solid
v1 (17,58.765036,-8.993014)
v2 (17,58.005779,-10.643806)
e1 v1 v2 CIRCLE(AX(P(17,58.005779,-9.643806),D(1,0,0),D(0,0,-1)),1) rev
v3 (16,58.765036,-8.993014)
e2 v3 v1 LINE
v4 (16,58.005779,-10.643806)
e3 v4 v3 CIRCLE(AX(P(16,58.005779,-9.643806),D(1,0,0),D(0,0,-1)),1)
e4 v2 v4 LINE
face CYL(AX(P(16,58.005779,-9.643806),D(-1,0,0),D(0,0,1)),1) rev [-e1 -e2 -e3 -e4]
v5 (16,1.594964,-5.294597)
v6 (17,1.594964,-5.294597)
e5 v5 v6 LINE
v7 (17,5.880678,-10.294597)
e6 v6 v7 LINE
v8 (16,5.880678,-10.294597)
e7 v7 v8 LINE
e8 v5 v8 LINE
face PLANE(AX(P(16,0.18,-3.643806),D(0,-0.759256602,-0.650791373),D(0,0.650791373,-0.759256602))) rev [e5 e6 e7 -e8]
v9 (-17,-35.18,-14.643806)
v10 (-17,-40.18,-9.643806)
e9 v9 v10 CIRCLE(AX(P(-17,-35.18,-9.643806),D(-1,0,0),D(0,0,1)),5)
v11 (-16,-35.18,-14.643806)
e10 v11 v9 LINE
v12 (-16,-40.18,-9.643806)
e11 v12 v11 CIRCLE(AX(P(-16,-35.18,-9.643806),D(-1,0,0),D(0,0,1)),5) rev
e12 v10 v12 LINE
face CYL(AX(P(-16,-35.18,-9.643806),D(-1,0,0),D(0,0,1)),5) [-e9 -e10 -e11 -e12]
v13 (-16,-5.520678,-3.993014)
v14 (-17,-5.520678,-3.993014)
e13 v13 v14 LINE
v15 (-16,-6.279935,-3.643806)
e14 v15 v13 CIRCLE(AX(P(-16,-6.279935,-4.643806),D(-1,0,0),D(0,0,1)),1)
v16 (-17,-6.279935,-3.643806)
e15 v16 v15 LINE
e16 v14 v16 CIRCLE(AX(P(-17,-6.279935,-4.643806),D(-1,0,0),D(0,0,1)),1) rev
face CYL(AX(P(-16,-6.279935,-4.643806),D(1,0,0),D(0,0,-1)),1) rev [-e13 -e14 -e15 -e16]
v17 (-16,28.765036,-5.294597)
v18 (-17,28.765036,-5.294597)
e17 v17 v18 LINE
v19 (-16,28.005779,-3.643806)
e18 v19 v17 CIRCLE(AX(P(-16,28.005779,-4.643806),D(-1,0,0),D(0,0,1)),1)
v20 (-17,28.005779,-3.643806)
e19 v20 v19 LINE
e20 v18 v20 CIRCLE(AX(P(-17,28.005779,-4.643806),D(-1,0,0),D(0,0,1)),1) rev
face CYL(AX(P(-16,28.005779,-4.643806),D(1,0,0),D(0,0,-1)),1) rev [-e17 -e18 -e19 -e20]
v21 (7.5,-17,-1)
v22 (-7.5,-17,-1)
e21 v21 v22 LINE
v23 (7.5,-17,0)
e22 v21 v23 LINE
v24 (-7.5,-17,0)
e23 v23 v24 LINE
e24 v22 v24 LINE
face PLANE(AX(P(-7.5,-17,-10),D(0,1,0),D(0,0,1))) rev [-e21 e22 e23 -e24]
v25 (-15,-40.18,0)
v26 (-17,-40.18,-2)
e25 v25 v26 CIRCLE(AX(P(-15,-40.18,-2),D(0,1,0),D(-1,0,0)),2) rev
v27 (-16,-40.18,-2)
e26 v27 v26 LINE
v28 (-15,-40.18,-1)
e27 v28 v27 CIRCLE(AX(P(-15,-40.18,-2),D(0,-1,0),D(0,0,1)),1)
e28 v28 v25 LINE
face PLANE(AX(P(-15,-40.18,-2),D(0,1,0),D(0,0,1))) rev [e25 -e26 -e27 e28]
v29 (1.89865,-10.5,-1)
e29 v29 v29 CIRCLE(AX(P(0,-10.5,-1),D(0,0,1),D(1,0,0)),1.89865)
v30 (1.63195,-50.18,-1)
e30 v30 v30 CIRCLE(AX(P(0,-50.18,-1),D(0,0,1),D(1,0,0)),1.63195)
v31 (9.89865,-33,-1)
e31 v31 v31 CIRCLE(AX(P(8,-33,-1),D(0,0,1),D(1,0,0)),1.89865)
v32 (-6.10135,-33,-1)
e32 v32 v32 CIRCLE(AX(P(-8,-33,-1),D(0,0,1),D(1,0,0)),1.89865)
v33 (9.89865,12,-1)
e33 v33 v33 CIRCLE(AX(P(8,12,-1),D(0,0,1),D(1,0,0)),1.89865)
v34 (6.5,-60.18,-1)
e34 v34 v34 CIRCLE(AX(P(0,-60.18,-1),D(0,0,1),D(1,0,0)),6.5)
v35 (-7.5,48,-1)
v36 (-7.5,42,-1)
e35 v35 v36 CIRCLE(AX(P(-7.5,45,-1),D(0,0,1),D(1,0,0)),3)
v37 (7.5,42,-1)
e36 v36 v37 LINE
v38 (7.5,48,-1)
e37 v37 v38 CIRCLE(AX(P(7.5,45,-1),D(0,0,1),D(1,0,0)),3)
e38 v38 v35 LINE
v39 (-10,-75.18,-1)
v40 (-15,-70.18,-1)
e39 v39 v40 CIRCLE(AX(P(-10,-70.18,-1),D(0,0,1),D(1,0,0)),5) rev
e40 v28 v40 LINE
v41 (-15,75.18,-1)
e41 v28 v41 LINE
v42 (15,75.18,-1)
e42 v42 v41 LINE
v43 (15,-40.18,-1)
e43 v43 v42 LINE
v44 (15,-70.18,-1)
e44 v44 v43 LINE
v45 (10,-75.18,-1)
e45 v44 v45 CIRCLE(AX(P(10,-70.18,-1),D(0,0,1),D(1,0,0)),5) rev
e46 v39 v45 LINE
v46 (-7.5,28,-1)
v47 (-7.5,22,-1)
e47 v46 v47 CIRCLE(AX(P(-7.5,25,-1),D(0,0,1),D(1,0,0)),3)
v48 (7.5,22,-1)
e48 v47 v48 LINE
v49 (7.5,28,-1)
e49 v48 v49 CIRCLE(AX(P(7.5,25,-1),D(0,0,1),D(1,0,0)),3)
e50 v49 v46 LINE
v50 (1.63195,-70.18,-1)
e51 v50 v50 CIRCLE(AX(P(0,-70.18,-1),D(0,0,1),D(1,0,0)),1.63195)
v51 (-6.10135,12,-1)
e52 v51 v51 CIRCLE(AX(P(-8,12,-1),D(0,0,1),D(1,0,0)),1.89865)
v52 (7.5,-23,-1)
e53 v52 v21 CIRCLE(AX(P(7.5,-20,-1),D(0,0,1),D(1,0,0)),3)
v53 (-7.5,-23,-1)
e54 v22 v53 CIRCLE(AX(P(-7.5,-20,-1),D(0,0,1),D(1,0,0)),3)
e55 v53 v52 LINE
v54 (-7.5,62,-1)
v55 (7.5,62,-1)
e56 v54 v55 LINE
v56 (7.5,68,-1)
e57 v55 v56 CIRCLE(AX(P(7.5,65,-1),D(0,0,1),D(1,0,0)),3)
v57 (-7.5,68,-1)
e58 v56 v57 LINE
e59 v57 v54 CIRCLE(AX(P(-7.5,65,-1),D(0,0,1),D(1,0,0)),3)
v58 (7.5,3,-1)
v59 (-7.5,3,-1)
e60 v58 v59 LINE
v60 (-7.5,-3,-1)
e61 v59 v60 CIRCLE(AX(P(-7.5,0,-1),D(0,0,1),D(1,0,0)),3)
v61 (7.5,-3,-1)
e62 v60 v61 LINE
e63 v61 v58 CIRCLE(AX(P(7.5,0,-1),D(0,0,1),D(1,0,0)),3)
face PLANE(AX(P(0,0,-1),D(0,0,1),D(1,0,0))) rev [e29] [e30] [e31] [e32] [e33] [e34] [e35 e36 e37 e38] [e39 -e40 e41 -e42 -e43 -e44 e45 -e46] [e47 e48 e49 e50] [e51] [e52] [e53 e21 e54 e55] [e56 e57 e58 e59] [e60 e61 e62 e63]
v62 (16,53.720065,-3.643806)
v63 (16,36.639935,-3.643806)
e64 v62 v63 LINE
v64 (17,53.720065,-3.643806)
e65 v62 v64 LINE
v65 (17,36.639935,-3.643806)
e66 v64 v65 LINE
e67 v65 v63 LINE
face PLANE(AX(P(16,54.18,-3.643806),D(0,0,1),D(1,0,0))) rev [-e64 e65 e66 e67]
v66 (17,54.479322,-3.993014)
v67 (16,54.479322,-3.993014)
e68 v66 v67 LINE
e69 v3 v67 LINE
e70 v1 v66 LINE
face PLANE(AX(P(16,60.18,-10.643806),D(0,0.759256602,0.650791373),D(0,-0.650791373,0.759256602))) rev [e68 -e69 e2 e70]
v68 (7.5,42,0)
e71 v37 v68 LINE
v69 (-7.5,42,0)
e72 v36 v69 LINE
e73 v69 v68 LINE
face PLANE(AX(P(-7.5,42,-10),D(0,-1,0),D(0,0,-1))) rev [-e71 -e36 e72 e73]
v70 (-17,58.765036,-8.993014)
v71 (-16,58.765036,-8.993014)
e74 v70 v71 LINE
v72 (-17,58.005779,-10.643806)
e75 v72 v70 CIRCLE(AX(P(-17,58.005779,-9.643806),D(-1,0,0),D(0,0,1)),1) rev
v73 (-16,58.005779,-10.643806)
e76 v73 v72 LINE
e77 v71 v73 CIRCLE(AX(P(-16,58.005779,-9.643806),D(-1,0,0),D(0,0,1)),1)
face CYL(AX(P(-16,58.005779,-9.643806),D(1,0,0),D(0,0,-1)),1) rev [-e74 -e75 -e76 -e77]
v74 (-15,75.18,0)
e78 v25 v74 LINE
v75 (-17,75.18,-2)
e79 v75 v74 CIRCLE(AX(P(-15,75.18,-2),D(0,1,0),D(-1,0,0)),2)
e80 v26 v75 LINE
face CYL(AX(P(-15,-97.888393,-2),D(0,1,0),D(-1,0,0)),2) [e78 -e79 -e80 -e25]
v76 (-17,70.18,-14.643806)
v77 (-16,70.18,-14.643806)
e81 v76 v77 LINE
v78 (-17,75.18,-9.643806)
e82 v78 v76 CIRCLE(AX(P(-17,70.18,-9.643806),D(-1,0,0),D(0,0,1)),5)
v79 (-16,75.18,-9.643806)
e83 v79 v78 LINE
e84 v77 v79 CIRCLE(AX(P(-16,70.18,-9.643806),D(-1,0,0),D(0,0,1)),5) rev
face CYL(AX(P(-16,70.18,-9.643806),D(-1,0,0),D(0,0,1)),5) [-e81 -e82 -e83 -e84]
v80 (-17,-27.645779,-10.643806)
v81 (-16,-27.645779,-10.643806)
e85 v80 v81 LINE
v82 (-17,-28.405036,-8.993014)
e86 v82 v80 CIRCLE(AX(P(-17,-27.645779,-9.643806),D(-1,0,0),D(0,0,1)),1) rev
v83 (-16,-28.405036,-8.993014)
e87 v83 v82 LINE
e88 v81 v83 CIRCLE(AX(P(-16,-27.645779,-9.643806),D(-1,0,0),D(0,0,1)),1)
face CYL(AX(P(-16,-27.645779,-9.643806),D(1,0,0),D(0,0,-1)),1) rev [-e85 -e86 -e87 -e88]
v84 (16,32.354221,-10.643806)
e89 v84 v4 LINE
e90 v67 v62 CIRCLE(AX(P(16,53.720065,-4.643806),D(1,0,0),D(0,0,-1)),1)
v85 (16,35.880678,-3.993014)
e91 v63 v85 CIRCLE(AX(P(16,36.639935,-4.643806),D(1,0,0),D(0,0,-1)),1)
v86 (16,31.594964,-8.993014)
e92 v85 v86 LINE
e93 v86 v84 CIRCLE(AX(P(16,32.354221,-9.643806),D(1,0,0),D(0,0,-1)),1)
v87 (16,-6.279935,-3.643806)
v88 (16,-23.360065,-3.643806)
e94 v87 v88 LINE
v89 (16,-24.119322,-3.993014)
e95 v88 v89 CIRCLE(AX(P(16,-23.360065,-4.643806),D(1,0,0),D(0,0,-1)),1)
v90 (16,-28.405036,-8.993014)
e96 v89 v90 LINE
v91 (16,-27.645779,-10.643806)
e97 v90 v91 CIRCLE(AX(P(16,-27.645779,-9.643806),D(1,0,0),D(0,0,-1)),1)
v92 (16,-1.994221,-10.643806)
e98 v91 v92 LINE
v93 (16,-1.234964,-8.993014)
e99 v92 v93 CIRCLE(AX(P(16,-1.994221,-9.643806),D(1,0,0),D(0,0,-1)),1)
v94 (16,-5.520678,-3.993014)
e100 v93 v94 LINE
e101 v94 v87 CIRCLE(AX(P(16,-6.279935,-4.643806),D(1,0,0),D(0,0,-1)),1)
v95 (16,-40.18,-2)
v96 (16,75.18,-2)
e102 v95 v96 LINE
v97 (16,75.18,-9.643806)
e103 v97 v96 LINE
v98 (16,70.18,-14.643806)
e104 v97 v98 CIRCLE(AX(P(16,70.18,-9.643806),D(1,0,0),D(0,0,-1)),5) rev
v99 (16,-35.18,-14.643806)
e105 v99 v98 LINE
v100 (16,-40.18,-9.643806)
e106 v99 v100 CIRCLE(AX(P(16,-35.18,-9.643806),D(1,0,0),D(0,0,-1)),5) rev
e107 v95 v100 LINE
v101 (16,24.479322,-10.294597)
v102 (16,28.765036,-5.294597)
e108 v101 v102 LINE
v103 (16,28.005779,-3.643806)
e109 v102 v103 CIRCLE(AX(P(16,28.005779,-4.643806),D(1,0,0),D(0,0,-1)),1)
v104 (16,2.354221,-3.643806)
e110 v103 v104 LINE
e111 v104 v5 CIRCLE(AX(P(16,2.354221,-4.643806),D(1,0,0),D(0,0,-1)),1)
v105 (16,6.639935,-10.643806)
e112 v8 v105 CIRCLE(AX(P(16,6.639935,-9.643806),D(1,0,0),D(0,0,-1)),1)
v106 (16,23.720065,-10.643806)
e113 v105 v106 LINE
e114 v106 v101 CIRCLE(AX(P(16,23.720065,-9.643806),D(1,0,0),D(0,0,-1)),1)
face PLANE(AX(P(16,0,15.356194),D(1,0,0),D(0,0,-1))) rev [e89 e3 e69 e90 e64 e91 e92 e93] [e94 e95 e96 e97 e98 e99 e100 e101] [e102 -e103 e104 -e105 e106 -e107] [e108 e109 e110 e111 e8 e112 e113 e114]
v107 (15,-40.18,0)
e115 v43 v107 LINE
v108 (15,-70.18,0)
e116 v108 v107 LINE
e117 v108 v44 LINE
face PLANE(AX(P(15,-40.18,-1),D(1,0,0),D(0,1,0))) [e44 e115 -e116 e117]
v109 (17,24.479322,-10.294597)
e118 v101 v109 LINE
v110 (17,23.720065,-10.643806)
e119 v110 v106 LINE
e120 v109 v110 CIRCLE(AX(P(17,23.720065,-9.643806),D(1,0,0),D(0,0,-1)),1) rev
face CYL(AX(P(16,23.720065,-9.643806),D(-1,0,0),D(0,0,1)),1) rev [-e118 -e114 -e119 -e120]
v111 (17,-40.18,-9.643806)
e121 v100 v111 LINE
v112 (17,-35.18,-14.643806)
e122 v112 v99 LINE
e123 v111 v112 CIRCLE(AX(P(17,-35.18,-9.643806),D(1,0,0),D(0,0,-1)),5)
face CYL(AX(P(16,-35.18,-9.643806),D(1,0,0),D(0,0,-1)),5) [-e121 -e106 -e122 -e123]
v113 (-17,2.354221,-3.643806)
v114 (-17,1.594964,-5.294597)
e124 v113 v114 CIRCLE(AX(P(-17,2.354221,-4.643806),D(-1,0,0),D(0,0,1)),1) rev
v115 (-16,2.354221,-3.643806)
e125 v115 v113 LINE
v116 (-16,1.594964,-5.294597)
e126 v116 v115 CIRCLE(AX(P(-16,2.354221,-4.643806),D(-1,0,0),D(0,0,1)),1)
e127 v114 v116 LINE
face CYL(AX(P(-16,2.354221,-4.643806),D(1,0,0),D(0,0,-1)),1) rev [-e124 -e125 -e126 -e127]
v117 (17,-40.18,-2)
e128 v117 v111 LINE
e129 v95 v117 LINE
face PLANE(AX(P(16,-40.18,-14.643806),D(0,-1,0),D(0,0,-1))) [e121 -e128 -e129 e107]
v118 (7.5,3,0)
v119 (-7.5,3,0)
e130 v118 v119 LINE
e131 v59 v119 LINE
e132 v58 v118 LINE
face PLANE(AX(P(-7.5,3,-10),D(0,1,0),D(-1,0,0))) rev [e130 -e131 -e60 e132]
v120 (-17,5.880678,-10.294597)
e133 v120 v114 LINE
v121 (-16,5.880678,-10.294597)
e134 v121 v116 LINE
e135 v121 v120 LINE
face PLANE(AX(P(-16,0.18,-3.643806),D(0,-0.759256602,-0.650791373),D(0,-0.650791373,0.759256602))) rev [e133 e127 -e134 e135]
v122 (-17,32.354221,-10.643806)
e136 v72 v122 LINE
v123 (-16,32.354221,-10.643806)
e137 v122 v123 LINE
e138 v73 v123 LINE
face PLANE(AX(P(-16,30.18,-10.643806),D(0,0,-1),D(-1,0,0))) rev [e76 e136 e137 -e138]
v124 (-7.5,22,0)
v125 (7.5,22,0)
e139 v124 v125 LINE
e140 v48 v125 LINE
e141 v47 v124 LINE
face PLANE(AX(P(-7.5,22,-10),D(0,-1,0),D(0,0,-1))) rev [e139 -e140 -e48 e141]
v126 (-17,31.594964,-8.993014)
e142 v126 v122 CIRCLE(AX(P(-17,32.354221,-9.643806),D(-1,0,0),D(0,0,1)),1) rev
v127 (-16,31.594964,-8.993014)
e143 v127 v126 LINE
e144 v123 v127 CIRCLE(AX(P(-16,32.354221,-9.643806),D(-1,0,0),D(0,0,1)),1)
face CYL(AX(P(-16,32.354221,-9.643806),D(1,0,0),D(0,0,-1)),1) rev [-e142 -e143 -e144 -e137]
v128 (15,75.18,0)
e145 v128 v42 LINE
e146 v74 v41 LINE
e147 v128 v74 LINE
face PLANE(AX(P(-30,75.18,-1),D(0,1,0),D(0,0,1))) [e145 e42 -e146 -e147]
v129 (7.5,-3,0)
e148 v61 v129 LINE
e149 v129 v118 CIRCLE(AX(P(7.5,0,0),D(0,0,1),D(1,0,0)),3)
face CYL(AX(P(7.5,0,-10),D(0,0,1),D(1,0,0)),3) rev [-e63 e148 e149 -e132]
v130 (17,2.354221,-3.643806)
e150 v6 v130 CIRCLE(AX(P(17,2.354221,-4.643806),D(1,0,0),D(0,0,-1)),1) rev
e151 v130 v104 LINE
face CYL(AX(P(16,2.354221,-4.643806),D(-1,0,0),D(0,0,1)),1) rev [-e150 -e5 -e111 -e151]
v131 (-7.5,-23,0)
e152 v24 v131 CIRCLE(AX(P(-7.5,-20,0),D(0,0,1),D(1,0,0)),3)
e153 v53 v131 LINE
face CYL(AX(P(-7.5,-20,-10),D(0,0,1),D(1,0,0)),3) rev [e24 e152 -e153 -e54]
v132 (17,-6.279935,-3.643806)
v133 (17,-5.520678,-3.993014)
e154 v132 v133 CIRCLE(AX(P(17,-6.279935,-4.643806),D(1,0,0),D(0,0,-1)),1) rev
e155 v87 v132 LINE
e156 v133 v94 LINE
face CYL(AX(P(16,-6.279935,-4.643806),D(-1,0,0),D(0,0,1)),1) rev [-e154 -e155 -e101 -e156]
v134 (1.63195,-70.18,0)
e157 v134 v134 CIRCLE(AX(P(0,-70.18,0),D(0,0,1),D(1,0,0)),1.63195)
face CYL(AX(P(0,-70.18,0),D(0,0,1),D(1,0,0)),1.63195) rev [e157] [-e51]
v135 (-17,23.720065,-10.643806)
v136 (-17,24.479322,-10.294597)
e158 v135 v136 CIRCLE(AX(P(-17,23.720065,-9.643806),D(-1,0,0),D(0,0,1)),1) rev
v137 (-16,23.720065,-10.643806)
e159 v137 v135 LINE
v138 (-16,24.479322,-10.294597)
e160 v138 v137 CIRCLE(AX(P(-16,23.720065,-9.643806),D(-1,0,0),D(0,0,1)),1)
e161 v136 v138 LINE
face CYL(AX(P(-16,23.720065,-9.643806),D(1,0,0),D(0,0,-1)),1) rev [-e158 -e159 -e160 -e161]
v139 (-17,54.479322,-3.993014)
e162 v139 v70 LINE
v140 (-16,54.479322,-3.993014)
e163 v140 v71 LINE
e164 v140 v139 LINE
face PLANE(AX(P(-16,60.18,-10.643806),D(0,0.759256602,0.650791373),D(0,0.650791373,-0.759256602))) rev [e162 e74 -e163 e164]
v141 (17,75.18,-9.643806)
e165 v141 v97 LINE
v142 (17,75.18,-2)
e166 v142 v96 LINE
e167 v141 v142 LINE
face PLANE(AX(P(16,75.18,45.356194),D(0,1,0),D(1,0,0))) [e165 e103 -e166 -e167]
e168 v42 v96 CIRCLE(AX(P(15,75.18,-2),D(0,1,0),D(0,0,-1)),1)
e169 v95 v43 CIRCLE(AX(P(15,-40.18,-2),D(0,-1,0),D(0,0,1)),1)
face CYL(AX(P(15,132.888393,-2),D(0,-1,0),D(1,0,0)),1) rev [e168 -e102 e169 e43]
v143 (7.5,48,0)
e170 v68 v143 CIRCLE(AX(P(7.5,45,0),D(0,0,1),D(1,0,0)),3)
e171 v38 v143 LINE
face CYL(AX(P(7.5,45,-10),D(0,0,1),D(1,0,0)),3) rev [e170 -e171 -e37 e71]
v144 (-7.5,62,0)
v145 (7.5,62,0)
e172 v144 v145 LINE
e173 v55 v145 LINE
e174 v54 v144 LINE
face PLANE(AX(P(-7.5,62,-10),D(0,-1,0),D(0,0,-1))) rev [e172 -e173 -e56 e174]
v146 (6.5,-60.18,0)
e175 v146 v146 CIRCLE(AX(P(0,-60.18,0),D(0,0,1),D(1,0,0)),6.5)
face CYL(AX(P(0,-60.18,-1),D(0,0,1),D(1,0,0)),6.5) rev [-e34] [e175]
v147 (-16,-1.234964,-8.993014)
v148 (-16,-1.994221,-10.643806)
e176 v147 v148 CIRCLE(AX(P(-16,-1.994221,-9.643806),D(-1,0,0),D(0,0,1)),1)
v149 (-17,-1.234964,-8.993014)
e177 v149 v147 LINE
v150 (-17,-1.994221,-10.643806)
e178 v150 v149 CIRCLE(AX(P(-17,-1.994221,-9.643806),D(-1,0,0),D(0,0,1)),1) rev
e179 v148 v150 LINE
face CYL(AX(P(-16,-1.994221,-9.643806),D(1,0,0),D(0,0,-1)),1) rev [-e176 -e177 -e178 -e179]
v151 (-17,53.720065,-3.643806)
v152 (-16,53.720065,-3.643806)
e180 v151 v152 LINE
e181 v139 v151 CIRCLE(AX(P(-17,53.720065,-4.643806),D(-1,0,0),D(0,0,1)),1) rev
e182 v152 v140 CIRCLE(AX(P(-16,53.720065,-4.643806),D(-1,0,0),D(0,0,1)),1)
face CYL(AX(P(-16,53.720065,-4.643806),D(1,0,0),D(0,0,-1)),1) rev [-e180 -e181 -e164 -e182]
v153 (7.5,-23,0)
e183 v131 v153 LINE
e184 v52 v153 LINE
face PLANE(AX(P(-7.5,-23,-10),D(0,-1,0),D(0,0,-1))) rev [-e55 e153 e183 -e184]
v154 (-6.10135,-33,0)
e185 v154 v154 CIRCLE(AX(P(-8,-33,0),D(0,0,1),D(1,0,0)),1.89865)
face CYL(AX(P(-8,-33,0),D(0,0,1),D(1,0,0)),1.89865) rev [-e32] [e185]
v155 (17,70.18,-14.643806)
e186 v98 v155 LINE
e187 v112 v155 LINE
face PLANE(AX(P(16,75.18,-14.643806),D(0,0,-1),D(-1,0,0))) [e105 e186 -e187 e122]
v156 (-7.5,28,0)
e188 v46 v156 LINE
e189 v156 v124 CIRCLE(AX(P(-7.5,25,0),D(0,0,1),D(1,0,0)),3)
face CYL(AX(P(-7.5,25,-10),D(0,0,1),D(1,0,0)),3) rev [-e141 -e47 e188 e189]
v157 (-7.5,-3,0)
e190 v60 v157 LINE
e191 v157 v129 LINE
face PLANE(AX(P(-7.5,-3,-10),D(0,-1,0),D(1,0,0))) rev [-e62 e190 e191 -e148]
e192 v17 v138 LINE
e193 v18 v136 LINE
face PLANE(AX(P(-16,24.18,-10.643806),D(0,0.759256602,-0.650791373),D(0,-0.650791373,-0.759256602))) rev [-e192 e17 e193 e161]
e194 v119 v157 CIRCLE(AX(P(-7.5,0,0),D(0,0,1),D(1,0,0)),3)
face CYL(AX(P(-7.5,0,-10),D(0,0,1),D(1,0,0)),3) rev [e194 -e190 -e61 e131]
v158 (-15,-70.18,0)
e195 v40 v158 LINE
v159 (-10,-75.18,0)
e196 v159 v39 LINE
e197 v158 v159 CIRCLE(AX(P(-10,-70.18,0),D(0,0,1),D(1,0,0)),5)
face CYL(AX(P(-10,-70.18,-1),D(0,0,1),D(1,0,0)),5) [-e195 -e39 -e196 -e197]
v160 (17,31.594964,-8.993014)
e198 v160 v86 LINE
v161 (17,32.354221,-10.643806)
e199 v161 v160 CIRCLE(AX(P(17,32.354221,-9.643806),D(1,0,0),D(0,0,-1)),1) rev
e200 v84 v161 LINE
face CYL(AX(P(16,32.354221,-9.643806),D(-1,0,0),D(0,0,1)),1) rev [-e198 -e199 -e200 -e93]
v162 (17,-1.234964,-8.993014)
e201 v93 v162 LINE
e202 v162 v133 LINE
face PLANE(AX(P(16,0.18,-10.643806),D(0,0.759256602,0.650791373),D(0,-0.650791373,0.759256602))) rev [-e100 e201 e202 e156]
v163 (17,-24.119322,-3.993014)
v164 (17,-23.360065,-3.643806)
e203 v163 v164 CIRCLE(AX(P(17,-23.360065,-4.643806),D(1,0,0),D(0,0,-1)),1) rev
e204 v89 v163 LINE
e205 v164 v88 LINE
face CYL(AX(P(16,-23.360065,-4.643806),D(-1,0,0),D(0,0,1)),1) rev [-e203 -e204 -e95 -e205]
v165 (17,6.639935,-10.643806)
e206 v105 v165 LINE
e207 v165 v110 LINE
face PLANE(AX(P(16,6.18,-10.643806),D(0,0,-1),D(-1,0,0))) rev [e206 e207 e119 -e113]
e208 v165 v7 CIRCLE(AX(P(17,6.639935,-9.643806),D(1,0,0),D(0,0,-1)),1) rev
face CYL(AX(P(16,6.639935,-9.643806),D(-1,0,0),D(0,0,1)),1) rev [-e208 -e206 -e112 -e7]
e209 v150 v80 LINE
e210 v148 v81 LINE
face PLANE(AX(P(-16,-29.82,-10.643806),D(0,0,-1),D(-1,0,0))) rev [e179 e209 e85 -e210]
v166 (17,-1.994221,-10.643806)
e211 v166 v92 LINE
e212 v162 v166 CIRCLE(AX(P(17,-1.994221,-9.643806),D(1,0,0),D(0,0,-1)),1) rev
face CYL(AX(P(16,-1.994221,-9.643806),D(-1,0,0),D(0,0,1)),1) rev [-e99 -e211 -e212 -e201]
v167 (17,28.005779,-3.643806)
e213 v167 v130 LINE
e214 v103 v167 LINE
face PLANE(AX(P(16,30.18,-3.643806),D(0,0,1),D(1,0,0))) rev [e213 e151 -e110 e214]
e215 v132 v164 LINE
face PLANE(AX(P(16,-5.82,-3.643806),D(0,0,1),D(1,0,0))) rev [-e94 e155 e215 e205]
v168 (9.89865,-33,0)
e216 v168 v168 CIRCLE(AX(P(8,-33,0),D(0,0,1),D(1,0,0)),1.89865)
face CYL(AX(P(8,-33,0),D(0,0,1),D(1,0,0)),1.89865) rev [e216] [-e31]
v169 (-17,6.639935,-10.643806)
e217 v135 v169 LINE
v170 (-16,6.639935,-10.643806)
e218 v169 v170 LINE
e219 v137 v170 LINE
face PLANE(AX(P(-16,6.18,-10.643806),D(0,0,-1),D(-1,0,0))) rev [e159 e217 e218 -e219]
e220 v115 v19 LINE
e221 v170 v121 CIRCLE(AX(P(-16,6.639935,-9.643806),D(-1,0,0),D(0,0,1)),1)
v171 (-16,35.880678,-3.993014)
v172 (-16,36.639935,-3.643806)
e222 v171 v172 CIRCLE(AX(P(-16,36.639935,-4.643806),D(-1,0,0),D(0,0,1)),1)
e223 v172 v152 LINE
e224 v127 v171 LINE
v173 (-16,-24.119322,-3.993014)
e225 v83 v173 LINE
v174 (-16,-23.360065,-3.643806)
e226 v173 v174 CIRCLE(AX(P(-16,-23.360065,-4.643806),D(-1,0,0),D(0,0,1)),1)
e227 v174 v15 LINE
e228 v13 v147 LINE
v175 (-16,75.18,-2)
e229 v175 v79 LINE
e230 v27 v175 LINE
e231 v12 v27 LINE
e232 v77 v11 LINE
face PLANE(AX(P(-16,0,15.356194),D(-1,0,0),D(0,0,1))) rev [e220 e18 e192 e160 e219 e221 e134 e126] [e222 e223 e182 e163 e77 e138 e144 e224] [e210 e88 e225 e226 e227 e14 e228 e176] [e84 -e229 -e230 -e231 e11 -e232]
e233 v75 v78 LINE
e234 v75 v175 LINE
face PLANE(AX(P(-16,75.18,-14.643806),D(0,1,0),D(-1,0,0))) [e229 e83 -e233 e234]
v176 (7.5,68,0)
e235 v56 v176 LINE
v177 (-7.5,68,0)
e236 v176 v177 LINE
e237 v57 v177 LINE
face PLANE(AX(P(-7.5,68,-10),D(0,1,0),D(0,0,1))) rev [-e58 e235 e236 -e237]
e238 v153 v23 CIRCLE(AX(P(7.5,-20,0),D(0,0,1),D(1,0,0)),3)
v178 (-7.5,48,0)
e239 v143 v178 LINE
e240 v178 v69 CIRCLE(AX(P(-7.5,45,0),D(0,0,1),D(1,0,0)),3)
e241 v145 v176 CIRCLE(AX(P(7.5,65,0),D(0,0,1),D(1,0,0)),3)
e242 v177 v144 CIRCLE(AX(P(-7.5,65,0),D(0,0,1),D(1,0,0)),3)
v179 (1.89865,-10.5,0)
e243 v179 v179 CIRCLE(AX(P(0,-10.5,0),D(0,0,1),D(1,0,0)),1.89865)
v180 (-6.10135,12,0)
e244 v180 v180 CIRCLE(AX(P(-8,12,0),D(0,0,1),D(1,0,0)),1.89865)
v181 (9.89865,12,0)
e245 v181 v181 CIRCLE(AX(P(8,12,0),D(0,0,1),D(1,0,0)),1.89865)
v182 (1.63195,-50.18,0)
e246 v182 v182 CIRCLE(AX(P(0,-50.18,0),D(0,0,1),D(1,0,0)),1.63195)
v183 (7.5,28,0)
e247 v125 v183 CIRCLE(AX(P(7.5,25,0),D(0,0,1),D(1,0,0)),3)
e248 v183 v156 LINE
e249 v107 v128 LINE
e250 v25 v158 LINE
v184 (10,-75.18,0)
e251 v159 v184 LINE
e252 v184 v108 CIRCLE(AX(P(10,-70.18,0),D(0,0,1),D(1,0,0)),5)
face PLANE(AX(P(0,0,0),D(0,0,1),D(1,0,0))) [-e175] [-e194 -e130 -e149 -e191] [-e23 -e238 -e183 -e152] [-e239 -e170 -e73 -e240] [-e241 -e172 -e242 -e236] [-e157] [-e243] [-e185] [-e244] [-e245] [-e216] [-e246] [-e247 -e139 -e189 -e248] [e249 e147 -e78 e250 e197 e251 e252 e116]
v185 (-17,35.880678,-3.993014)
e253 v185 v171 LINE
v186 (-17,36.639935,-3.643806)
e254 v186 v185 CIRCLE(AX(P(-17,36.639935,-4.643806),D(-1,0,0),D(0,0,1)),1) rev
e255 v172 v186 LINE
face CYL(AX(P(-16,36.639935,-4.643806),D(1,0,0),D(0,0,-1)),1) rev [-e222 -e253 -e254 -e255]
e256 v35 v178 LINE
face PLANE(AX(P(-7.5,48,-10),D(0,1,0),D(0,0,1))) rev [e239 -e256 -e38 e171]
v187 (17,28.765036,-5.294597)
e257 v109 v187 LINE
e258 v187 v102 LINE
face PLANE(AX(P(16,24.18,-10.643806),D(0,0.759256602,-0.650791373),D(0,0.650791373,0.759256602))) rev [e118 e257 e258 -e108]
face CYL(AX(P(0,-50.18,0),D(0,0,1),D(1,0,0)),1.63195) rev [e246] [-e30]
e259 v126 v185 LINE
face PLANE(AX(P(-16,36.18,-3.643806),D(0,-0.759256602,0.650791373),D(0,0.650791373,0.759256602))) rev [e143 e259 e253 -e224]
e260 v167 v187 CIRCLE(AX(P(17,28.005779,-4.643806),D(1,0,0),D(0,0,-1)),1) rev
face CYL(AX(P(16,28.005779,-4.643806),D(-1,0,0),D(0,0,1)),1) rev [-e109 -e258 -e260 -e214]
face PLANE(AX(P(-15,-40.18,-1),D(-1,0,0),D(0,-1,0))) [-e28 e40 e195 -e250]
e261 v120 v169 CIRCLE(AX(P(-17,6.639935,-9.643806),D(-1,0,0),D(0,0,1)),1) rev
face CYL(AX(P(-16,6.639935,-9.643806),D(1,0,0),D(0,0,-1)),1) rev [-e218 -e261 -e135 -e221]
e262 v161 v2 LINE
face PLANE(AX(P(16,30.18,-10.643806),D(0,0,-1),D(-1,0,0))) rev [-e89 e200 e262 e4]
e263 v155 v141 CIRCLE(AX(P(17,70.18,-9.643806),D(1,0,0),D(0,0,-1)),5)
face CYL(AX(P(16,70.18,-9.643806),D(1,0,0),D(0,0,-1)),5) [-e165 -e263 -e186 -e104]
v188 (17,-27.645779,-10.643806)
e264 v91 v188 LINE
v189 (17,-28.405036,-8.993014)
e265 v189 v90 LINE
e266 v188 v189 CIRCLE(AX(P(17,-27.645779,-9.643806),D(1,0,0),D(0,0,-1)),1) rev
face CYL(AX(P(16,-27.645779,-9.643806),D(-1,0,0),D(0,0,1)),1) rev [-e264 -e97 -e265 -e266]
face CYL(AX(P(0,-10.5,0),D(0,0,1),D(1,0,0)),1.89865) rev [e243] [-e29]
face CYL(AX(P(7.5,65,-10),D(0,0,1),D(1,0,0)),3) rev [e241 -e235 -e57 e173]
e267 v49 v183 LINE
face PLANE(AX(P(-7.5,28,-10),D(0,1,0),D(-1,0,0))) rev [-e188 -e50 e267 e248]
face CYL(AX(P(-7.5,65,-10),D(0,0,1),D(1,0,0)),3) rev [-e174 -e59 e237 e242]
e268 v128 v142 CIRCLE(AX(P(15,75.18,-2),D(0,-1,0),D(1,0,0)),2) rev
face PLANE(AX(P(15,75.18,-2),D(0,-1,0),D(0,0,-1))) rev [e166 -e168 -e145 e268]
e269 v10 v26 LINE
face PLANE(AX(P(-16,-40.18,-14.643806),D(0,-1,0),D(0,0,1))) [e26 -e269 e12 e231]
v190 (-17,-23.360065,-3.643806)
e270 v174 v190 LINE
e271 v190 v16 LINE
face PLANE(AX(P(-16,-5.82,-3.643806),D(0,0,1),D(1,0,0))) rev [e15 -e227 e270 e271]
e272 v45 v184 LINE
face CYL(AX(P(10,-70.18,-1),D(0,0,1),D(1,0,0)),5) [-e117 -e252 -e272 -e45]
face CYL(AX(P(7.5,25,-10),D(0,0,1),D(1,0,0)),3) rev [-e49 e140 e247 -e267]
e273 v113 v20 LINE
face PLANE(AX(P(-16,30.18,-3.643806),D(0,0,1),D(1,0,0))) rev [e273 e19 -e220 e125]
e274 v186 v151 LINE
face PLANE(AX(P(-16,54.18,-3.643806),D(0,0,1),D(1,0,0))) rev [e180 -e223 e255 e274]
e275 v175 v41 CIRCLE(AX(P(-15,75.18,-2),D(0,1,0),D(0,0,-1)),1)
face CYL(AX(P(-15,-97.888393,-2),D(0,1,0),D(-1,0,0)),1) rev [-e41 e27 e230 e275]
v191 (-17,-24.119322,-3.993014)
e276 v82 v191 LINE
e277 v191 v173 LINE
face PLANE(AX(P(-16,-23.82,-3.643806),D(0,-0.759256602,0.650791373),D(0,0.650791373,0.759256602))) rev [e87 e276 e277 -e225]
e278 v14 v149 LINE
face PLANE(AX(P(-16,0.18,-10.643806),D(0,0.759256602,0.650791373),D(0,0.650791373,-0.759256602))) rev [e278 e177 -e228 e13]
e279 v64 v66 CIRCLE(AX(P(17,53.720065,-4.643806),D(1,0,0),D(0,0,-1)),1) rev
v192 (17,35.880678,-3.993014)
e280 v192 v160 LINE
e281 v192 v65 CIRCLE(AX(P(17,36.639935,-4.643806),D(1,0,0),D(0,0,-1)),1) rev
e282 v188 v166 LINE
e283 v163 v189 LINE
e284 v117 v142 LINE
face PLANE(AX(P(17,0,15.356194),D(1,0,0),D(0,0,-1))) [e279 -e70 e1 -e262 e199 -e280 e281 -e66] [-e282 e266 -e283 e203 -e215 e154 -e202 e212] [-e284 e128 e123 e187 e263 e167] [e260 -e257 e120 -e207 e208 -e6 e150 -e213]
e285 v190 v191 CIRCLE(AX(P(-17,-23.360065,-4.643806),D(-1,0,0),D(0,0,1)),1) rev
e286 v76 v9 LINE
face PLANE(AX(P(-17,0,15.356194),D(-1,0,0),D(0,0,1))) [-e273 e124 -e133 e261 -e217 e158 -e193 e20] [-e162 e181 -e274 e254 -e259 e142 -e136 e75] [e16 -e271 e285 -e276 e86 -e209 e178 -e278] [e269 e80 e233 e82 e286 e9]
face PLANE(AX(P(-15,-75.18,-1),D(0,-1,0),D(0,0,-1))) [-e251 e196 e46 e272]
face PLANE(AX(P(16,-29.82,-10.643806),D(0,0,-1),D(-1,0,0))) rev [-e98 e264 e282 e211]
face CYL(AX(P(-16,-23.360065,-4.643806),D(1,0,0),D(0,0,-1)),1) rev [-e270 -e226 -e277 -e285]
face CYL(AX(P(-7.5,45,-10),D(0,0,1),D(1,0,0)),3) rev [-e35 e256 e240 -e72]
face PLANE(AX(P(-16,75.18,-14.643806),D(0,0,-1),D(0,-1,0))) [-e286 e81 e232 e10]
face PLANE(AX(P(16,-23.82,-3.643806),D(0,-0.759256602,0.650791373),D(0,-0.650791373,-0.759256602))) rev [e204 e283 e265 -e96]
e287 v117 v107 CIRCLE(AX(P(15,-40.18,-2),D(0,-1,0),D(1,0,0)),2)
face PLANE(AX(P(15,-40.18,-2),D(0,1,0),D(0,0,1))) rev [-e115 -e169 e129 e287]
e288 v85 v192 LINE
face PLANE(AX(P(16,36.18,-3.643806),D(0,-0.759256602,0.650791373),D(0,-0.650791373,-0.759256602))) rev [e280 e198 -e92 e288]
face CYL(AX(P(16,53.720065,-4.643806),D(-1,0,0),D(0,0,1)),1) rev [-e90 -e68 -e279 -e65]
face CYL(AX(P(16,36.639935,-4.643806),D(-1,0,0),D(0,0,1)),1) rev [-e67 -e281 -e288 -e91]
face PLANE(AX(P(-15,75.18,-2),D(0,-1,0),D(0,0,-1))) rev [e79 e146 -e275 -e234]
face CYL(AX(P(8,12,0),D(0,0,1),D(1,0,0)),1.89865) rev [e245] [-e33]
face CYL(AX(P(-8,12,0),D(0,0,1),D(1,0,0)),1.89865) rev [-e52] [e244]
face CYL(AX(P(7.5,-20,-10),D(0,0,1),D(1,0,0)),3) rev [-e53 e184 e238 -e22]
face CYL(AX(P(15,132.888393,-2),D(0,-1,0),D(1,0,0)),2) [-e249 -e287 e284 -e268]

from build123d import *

# Parameters (mm, degrees)
SKETCH1_R                  = 6.5
BASE_FLANGE1_DEPTH         = 1
FILLET1_R                  = 5
SKETCHED_START             = 16.78876
SKETCHED_BEND1_OUTLINE_W   = 115.36
SKETCHED_BEND1_OUTLINE_H   = 1
SKETCHED_BEND1_DEPTH       = 13.21124
SKETCHED_START_2           = -30
SKETCHED_BEND1_2_OUTLINE_W = 115.36
SKETCHED_BEND1_2_OUTLINE_H = 1
SKETCHED_BEND1_2_DEPTH     = 13.18876
SKETCHED_START_3           = 16
SKETCHED_BEND1_3_DEPTH     = 0.0274
SKETCHED_START_4           = -16.01124
SKETCHED_BEND1_4_DEPTH     = 0.01124
SKETCHED_START_5           = -17
SKETCHED_BEND1_5_DEPTH     = 2
SKETCHED_START_6           = 15
SKETCHED_BEND1_6_DEPTH     = 2
SKETCHED_START_7           = -40.18
SKETCHED_BEND1_7_DEPTH     = 115.36
F_4_CLEARANCE_HOLE1_D      = 3.2639
FILLET2_R                  = 1
F_6_CLEARANCE_HOLE2_D      = 3.7973
CUT_EXTRUDE1_DEPTH         = 10


with BuildPart() as part:
    # Base-Flange1: sheet metal written as solids
    # Sketch1 → Base-Flange1 (new body)
    with BuildSketch(Plane.XY):
        Polygon((-30, 75.18), (30, 75.18), (30, -40.18), (15, -40.18), (15, -75.18), (-15, -75.18), (-15, -40.18), (-30, -40.18), align=None)
        with Locations((0, -60.18)):
            Circle(SKETCH1_R, mode=Mode.SUBTRACT)
        Polygon((-26, 60.18), (-19, 54.18), (-19, 36.18), (-26, 30.18), align=None, mode=Mode.SUBTRACT)
        Polygon((-26, 24.18), (-19, 30.18), (-19, 0.18), (-26, 6.18), align=None, mode=Mode.SUBTRACT)
        Polygon((-26, -29.82), (-26, 0.18), (-19, -5.82), (-19, -23.82), align=None, mode=Mode.SUBTRACT)
        Polygon((19, -23.82), (26, -29.82), (26, 0.18), (19, -5.82), align=None, mode=Mode.SUBTRACT)
        Polygon((19, 0.18), (26, 6.18), (26, 24.18), (19, 30.18), align=None, mode=Mode.SUBTRACT)
        Polygon((19, 36.18), (26, 30.18), (26, 60.18), (19, 54.18), align=None, mode=Mode.SUBTRACT)
    extrude(amount=-BASE_FLANGE1_DEPTH)

    # Fillet1
    fillet1_edges = [part.edges().sort_by_distance(p)[0] for p in [
        (-30, 75.18, -0.5),
        (30, 75.18, -0.5),
        (30, -40.18, -0.5),
        (15, -75.18, -0.5),
        (-15, -75.18, -0.5),
        (-30, -40.18, -0.5),
    ]]
    fillet(fillet1_edges, radius=FILLET1_R)

    # Sketched Bend1: read off the stored shape, not the designer's step
    # Sketched Bend1 outline → Sketched Bend1 (cut)
    with BuildSketch(Plane.YZ.offset(SKETCHED_START)):
        with Locations((17.5, -0.5)):
            Rectangle(SKETCHED_BEND1_OUTLINE_W, SKETCHED_BEND1_OUTLINE_H)
    extrude(amount=SKETCHED_BEND1_DEPTH, mode=Mode.SUBTRACT)

    # Sketched Bend1 2 outline → Sketched Bend1 2 (cut)
    with BuildSketch(Plane.YZ.offset(SKETCHED_START_2)):
        with Locations((17.5, -0.5)):
            Rectangle(SKETCHED_BEND1_2_OUTLINE_W, SKETCHED_BEND1_2_OUTLINE_H)
    extrude(amount=SKETCHED_BEND1_2_DEPTH, mode=Mode.SUBTRACT)

    # Sketched Bend1 3 outline → Sketched Bend1 3 (add)
    with BuildSketch(Plane.YZ.offset(SKETCHED_START_3)):
        with BuildLine():
            Line((75.18, -9.64380551), (75.18, -1))
            Line((75.18, -1), (-40.18, -1))
            Line((-40.18, -1), (-40.18, -9.64380551))
            ThreePointArc((-40.18, -9.64380551), (-38.715533906, -13.179339416), (-35.18, -14.64380551))
            Line((-35.18, -14.64380551), (70.18, -14.64380551))
            ThreePointArc((70.18, -14.64380551), (73.715533906, -13.179339416), (75.18, -9.64380551))
        make_face()
        Polygon((-23.82, -3.64380551), (-5.82, -3.64380551), (0.18, -10.64380551), (-29.82, -10.64380551), align=None, mode=Mode.SUBTRACT)
        Polygon((0.18, -3.64380551), (30.18, -3.64380551), (24.18, -10.64380551), (6.18, -10.64380551), align=None, mode=Mode.SUBTRACT)
        Polygon((36.18, -3.64380551), (54.18, -3.64380551), (60.18, -10.64380551), (30.18, -10.64380551), align=None, mode=Mode.SUBTRACT)
    extrude(amount=SKETCHED_BEND1_3_DEPTH)

    # Sketched Bend1 4 outline → Sketched Bend1 4 (add)
    with BuildSketch(Plane.YZ.offset(SKETCHED_START_4)):
        with BuildLine():
            Line((75.18, -9.64380551), (75.18, -1))
            Line((75.18, -1), (-40.18, -1))
            Line((-40.18, -1), (-40.18, -9.64380551))
            ThreePointArc((-40.18, -9.64380551), (-38.715533906, -13.179339416), (-35.18, -14.64380551))
            Line((-35.18, -14.64380551), (70.18, -14.64380551))
            ThreePointArc((70.18, -14.64380551), (73.715533906, -13.179339416), (75.18, -9.64380551))
        make_face()
        Polygon((-23.82, -3.64380551), (-5.82, -3.64380551), (0.18, -10.64380551), (-29.82, -10.64380551), align=None, mode=Mode.SUBTRACT)
        Polygon((0.18, -3.64380551), (30.18, -3.64380551), (24.18, -10.64380551), (6.18, -10.64380551), align=None, mode=Mode.SUBTRACT)
        Polygon((36.18, -3.64380551), (54.18, -3.64380551), (60.18, -10.64380551), (30.18, -10.64380551), align=None, mode=Mode.SUBTRACT)
    extrude(amount=SKETCHED_BEND1_4_DEPTH)

    # Sketched Bend1 5 outline → Sketched Bend1 5 (add)
    with BuildSketch(Plane.YZ.offset(SKETCHED_START_5)):
        with BuildLine():
            Line((75.18, -9.64380551), (75.18, -1))
            Line((75.18, -1), (-40.18, -1))
            Line((-40.18, -1), (-40.18, -9.64380551))
            ThreePointArc((-40.18, -9.64380551), (-38.715533906, -13.179339416), (-35.18, -14.64380551))
            Line((-35.18, -14.64380551), (70.18, -14.64380551))
            ThreePointArc((70.18, -14.64380551), (73.715533906, -13.179339416), (75.18, -9.64380551))
        make_face()
        Polygon((-23.82, -3.64380551), (-5.82, -3.64380551), (0.18, -10.64380551), (-29.82, -10.64380551), align=None, mode=Mode.SUBTRACT)
        Polygon((0.18, -3.64380551), (30.18, -3.64380551), (24.18, -10.64380551), (6.18, -10.64380551), align=None, mode=Mode.SUBTRACT)
        Polygon((36.18, -3.64380551), (54.18, -3.64380551), (60.18, -10.64380551), (30.18, -10.64380551), align=None, mode=Mode.SUBTRACT)
    extrude(amount=SKETCHED_BEND1_5_DEPTH)

    # Sketched Bend1 6 outline → Sketched Bend1 6 (add)
    with BuildSketch(Plane.YZ.offset(SKETCHED_START_6)):
        with BuildLine():
            Line((75.18, -9.64380551), (75.18, -1))
            Line((75.18, -1), (-40.18, -1))
            Line((-40.18, -1), (-40.18, -9.64380551))
            ThreePointArc((-40.18, -9.64380551), (-38.715533906, -13.179339416), (-35.18, -14.64380551))
            Line((-35.18, -14.64380551), (70.18, -14.64380551))
            ThreePointArc((70.18, -14.64380551), (73.715533906, -13.179339416), (75.18, -9.64380551))
        make_face()
        Polygon((-23.82, -3.64380551), (-5.82, -3.64380551), (0.18, -10.64380551), (-29.82, -10.64380551), align=None, mode=Mode.SUBTRACT)
        Polygon((0.18, -3.64380551), (30.18, -3.64380551), (24.18, -10.64380551), (6.18, -10.64380551), align=None, mode=Mode.SUBTRACT)
        Polygon((36.18, -3.64380551), (54.18, -3.64380551), (60.18, -10.64380551), (30.18, -10.64380551), align=None, mode=Mode.SUBTRACT)
    extrude(amount=SKETCHED_BEND1_6_DEPTH)

    # Sketched Bend1 7 outline → Sketched Bend1 7 (cut)
    with BuildSketch(Plane(origin=(0, 0, 0), x_dir=(1, 0, 0), z_dir=(0, 1, 0)).offset(SKETCHED_START_7)):
        with BuildLine():
            ThreePointArc((-16, 2), (-15.707106781, 1.292893219), (-15, 1))
            Line((-15, 1), (-15, 14.64380551))
            Line((-15, 14.64380551), (-16, 14.64380551))
            Line((-16, 14.64380551), (-16, 2))
        make_face()
        with BuildLine():
            ThreePointArc((17, 2), (16.414213562, 0.585786438), (15, 0))
            Line((15, 0), (16.78876, 0))
            Line((16.78876, 0), (16.78876, 1))
            Line((16.78876, 1), (17, 1))
            Line((17, 1), (17, 2))
        make_face()
        with BuildLine():
            ThreePointArc((-15, 0), (-16.414213562, 0.585786438), (-17, 2))
            Line((-17, 2), (-17, 1))
            Line((-17, 1), (-16.81124, 1))
            Line((-16.81124, 1), (-16.81124, 0))
            Line((-16.81124, 0), (-15, 0))
        make_face()
        with BuildLine():
            ThreePointArc((15, 1), (15.707106781, 1.292893219), (16, 2))
            Line((16, 2), (16, 14.64380551))
            Line((16, 14.64380551), (15, 14.64380551))
            Line((15, 14.64380551), (15, 1))
        make_face()
    extrude(amount=SKETCHED_BEND1_7_DEPTH, mode=Mode.SUBTRACT)

    # #4 Clearance Hole1 (through all)
    with Locations(Plane.XY):
        with Locations((0, -50.18), (0, -70.18)):
            Hole(F_4_CLEARANCE_HOLE1_D / 2)

    # Fillet2
    fillet2_edges = [part.edges().sort_by_distance(p)[0] for p in [
        (-16.5, 36.18, -3.64380551),
        (-16.5, 30.18, -10.64380551),
        (-16.5, 60.18, -10.64380551),
        (-16.5, 54.18, -3.64380551),
        (-16.5, 30.18, -3.64380551),
        (-16.5, 0.18, -3.64380551),
        (-16.5, 6.18, -10.64380551),
        (-16.5, 24.18, -10.64380551),
        (-16.5, -29.82, -10.64380551),
        (-16.5, 0.18, -10.64380551),
        (-16.5, -5.82, -3.64380551),
        (-16.5, -23.82, -3.64380551),
        (16.5, -29.82, -10.64380551),
        (16.5, -23.82, -3.64380551),
        (16.5, -5.82, -3.64380551),
        (16.5, 0.18, -10.64380551),
        (16.5, 6.18, -10.64380551),
        (16.5, 0.18, -3.64380551),
        (16.5, 30.18, -3.64380551),
        (16.5, 24.18, -10.64380551),
        (16.5, 30.18, -10.64380551),
        (16.5, 36.18, -3.64380551),
        (16.5, 54.18, -3.64380551),
        (16.5, 60.18, -10.64380551),
    ]]
    fillet(fillet2_edges, radius=FILLET2_R)

    # #6 Clearance Hole2 (through all)
    with Locations(Plane.XY):
        with Locations((-8, 12), (8, 12), (0, -10.5), (-8, -33), (8, -33)):
            Hole(F_6_CLEARANCE_HOLE2_D / 2)

    # Sketch13 → Cut-Extrude1 (cut)
    with BuildSketch(Plane.XY):
        with BuildLine():
            Line((-7.5, 3), (7.5, 3))
            ThreePointArc((7.5, 3), (10.5, 0), (7.5, -3))
            Line((7.5, -3), (-7.5, -3))
            ThreePointArc((-7.5, -3), (-10.5, 0), (-7.5, 3))
        make_face()
        with BuildLine():
            Line((-7.5, -17), (7.5, -17))
            ThreePointArc((7.5, -17), (10.5, -20), (7.5, -23))
            Line((7.5, -23), (-7.5, -23))
            ThreePointArc((-7.5, -23), (-10.5, -20), (-7.5, -17))
        make_face()
        with BuildLine():
            Line((-7.5, 28), (7.5, 28))
            ThreePointArc((7.5, 28), (10.5, 25), (7.5, 22))
            Line((7.5, 22), (-7.5, 22))
            ThreePointArc((-7.5, 22), (-10.5, 25), (-7.5, 28))
        make_face()
        with BuildLine():
            Line((-7.5, 48), (7.5, 48))
            ThreePointArc((7.5, 48), (10.5, 45), (7.5, 42))
            Line((7.5, 42), (-7.5, 42))
            ThreePointArc((-7.5, 42), (-10.5, 45), (-7.5, 48))
        make_face()
        with BuildLine():
            Line((-7.5, 68), (7.5, 68))
            ThreePointArc((7.5, 68), (10.5, 65), (7.5, 62))
            Line((7.5, 62), (-7.5, 62))
            ThreePointArc((-7.5, 62), (-10.5, 65), (-7.5, 68))
        make_face()
    extrude(amount=-CUT_EXTRUDE1_DEPTH, mode=Mode.SUBTRACT)


solid = part.part
